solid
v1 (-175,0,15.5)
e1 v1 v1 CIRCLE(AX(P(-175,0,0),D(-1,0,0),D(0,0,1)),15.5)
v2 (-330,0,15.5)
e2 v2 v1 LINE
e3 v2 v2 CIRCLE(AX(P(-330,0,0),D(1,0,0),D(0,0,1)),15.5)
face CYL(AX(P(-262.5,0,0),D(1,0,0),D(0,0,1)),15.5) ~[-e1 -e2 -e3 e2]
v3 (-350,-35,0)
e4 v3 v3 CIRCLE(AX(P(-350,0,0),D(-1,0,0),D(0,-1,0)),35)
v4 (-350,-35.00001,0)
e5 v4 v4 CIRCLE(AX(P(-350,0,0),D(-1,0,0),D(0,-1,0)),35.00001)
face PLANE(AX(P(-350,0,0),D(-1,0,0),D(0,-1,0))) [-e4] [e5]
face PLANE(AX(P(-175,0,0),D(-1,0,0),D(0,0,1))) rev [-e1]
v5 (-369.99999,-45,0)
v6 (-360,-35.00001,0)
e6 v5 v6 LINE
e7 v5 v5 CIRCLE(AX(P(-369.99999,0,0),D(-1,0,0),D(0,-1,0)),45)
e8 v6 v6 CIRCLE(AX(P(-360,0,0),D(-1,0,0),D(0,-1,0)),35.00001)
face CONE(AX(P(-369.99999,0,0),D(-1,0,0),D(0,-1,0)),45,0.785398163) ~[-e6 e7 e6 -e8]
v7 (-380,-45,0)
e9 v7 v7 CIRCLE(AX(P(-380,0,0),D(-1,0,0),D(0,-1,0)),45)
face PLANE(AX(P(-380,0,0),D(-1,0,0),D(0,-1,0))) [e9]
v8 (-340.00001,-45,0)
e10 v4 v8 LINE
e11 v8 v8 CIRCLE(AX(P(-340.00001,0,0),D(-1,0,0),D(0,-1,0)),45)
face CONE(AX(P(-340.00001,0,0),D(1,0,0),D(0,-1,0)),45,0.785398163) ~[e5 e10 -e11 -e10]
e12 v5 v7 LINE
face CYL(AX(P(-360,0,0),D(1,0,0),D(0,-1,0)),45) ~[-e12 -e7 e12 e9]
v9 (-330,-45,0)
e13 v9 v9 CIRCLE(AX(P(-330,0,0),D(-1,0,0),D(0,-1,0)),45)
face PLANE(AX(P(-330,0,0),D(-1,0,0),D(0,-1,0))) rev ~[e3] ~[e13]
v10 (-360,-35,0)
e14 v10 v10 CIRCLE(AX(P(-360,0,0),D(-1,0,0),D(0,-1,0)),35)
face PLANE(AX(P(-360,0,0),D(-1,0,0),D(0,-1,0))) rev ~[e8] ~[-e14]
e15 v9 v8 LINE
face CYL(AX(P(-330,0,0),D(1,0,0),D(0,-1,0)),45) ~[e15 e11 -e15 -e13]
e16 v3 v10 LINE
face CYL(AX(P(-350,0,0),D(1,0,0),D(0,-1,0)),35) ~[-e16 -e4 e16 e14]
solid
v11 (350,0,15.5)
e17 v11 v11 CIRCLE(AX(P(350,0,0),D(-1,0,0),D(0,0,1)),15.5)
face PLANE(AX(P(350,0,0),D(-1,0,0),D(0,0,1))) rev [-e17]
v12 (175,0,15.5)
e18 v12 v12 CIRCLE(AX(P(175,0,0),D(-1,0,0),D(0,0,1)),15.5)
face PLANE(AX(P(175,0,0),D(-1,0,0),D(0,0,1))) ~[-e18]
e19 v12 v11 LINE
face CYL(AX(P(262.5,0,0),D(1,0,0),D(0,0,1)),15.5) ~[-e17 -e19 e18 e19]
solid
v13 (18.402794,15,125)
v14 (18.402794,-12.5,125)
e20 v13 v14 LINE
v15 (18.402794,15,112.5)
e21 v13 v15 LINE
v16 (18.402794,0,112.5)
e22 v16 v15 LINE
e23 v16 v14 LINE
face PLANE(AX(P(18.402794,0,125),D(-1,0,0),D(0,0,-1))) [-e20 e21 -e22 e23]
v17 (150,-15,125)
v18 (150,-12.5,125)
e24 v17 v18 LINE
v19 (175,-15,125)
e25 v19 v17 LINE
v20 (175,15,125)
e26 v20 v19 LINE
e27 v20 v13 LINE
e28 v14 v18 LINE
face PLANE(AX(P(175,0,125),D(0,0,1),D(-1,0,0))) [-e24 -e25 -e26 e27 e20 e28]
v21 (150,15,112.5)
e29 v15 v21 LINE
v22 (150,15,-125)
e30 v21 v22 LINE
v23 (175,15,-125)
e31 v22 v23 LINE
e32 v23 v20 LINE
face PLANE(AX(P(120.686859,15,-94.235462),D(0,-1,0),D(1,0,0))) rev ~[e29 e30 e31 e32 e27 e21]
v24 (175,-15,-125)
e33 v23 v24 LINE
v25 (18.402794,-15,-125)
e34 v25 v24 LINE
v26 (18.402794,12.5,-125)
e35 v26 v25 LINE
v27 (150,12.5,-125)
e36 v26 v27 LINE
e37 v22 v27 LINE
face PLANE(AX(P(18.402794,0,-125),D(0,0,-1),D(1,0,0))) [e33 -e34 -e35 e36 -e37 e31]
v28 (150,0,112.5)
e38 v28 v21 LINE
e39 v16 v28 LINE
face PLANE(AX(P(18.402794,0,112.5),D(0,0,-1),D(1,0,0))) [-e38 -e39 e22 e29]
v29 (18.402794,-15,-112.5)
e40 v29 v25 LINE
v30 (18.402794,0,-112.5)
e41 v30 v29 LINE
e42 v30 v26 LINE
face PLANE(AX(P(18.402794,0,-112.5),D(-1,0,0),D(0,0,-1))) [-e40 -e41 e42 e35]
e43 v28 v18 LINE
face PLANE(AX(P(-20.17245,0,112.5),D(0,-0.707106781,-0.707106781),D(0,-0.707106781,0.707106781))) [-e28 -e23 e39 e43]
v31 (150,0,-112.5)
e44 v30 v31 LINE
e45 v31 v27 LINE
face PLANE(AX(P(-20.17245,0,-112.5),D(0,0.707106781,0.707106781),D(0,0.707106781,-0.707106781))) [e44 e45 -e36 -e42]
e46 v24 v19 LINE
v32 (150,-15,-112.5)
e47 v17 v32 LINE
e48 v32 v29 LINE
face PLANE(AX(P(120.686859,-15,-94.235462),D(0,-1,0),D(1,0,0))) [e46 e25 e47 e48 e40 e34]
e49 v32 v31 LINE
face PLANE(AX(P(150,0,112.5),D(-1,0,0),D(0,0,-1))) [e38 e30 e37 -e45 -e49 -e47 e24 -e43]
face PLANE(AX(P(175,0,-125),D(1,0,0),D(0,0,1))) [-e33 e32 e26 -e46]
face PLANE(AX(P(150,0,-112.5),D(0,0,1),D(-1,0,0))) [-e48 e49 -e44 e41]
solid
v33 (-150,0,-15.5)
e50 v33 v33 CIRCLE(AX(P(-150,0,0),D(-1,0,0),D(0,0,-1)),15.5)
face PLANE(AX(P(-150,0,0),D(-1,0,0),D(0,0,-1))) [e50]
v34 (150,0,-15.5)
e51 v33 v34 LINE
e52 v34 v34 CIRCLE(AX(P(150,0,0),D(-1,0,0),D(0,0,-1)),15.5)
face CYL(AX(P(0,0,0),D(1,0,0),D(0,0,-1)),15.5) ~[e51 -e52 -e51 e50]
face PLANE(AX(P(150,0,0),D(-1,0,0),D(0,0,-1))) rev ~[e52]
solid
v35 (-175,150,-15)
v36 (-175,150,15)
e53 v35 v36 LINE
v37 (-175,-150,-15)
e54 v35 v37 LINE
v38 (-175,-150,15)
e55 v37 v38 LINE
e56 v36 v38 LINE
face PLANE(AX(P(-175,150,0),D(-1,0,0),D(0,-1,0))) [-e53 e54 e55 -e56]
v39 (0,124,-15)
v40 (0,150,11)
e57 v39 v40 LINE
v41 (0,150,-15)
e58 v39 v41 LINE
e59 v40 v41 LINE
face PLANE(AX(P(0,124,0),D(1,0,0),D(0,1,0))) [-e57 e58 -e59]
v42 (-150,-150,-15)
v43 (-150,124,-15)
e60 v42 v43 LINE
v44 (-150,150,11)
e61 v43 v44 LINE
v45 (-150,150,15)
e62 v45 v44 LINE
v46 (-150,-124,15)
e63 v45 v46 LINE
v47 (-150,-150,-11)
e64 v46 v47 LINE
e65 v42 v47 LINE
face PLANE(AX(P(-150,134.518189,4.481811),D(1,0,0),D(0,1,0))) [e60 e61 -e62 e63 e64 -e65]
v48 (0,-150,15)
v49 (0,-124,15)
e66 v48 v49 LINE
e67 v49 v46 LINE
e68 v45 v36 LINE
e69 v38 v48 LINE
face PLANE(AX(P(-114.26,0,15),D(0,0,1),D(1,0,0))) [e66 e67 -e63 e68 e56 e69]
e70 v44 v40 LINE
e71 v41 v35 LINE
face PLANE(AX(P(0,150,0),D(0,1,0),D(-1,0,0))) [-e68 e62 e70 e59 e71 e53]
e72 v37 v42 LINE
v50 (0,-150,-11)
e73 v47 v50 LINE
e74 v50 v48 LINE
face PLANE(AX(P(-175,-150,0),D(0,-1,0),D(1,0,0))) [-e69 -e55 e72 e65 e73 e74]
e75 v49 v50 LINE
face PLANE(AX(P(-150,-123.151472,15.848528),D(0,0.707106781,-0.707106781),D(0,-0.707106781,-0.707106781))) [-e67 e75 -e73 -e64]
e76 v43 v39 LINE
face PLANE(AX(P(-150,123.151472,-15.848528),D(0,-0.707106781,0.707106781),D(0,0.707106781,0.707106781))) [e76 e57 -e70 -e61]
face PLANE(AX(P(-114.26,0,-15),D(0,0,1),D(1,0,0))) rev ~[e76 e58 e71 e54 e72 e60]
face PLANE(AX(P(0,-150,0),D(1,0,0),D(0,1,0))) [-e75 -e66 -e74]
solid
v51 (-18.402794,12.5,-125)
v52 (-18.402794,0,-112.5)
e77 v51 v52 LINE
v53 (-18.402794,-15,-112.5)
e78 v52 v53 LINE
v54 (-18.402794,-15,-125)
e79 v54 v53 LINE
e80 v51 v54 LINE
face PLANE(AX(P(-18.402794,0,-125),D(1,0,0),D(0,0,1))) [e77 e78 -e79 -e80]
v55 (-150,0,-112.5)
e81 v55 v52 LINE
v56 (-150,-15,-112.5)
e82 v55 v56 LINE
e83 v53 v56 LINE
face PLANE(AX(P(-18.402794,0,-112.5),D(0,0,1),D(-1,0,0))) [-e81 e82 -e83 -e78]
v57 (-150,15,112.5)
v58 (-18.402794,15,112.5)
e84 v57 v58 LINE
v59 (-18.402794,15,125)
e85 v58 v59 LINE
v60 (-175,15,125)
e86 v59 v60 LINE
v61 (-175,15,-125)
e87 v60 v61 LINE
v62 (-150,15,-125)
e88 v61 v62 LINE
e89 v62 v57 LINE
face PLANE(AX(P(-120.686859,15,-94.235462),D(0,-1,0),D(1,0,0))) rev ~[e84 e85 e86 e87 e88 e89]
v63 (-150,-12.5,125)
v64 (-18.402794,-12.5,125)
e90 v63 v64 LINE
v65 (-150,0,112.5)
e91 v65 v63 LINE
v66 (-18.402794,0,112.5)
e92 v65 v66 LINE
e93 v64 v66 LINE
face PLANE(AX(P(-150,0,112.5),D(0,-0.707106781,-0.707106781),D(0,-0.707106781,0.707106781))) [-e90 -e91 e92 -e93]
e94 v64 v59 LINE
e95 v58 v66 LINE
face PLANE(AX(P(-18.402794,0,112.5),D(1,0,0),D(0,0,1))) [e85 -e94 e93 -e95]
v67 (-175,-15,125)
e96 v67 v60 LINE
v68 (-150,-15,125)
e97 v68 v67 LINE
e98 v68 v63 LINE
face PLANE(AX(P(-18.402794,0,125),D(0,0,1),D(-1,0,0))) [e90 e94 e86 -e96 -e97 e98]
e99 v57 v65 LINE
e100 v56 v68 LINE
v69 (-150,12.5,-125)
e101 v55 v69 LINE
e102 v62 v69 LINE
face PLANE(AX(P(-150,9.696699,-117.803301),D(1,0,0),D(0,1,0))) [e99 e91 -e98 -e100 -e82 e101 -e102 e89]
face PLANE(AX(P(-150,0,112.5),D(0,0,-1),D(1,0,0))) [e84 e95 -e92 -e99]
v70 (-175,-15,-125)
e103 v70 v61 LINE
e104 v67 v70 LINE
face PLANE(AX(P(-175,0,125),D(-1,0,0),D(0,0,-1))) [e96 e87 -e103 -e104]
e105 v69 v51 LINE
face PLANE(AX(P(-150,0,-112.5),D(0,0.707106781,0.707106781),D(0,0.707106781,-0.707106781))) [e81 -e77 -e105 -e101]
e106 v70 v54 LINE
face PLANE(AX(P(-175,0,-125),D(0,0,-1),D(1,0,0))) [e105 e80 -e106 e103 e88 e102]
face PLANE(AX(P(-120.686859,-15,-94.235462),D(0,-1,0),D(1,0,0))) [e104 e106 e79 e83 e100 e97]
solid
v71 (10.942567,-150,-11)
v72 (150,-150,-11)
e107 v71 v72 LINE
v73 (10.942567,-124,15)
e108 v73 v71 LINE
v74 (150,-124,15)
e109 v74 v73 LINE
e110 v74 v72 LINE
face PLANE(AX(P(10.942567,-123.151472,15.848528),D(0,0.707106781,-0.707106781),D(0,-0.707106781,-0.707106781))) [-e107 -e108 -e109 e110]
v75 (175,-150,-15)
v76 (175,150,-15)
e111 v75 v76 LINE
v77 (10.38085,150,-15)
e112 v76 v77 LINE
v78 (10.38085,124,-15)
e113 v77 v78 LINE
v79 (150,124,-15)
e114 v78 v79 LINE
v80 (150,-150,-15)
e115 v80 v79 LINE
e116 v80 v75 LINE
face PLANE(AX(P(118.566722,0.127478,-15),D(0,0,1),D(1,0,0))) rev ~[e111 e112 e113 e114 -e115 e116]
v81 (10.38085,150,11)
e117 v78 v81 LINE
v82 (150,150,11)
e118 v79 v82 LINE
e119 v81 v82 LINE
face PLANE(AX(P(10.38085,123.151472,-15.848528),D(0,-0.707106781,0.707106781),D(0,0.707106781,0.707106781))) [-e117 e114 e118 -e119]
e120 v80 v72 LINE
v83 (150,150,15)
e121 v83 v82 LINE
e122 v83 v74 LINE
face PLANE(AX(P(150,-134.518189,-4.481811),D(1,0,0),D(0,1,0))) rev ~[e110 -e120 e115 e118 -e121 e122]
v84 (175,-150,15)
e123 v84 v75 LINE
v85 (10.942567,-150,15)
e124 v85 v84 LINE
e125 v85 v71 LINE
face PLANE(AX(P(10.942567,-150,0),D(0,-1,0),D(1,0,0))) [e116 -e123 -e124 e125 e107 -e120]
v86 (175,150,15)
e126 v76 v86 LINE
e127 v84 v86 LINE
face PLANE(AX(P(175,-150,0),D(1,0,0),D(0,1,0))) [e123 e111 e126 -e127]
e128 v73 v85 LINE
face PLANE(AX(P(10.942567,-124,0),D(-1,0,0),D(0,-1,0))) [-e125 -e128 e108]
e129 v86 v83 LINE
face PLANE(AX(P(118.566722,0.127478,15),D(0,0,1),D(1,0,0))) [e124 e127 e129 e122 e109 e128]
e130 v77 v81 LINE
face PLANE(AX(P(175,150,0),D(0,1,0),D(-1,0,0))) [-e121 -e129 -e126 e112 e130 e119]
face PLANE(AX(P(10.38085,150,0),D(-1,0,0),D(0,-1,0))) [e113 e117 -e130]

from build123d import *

# Parameters (mm, degrees)
F0_W           = 175
F0_H           = 15.5
F0_W_2         = 25
F2_DEPTH       = 15
F4_DEPTH       = 15
F5_T1_DEPTH    = 150
F5_2_T1_DEPTH  = 139.6191499531
F5_2_T3_DEPTH  = 139.0574328601
F6_R           = 50
F7_DEPTH       = 20
F8_R           = 45
F9_DEPTH       = 20
F10_R          = 35
F11_DEPTH      = 10
F12_R          = 45
F13_DEPTH      = 20
F14_SIZE       = 9.99999
F15_T1_DEPTH   = 170.1724504435
F15_2_T1_DEPTH = 170.1724504435
F16_T1_DEPTH   = 170.1724504435
F16_2_T1_DEPTH = 170.1724504435
F0_W_3         = 300


# Not quite as in the source:
# - a fillet or chamfer that OpenCascade refuses, or shapes differently, is made with other operations: its cross-section is extruded or revolved along the edge and cut away or added
# - a fillet or chamfer is up to 0.001 mm smaller than in the source, because OpenCascade refuses the exact size
# - a feature names something its author has since deleted; it is built from what else it names


with BuildPart() as f1:
    # F0 (on Front) → F1 (revolve)
    with BuildSketch(Plane.XZ):
        with Locations((262.5, 7.75)):
            Rectangle(F0_W, F0_H)
    revolve(axis=Axis((0, 0, 0), (-1, 0, 0)))


with BuildPart() as f1b:
    # F0 (on Front) → F1, piece 2 (revolve)
    with BuildSketch(Plane.XZ):
        with Locations((-262.5, 7.75)):
            Rectangle(F0_W, F0_H)
    revolve(axis=Axis((0, 0, 0), (-1, 0, 0)))

    # F6 (on face) → F7 (cut)
    with BuildSketch(Plane(origin=(-350, 0, 0), x_dir=(0, -1, 0), z_dir=(-1, 0, 0))):
        Circle(F6_R)
    extrude(amount=-F7_DEPTH, mode=Mode.SUBTRACT)

    # F8 (on face) → F9 (join)
    with BuildSketch(Plane(origin=(-330, 0, 0), x_dir=(0, -1, 0), z_dir=(-1, 0, 0))):
        Circle(F8_R)
    extrude(amount=F9_DEPTH)

    # F10 (on face) → F11 (join)
    with BuildSketch(Plane(origin=(-350, 0, 0), x_dir=(0, -1, 0), z_dir=(-1, 0, 0))):
        Circle(F10_R)
    extrude(amount=F11_DEPTH)

    # F12 (on face) → F13 (join)
    with BuildSketch(Plane(origin=(-360, 0, 0), x_dir=(0, -1, 0), z_dir=(-1, 0, 0))):
        Circle(F12_R)
    extrude(amount=F13_DEPTH)

    # F14 (size 10 in the source; OpenCascade refuses exactly that, so slightly less here)
    f14_edges = [f1b.edges().sort_by_distance(p)[0] for p in [
        (-350, 45, 0),
        (-360, 45, 0),
    ]]
    chamfer(f14_edges, length=F14_SIZE)


with BuildPart() as f2:
    # F0 (on Front) → F2 (new body, symmetric)
    with BuildSketch(Plane.XZ):
        Polygon((-150, -15.5), (-175, -15.5), (-175, -125), (-18.402794376, -125), (-18.402794376, -112.5), (-150, -112.5), align=None)
        Polygon((-175, 125), (-175, 15.5), (-150, 15.5), (-150, 112.5), (-18.402794376, 112.5), (-18.402794376, 125), align=None)
        with Locations((-162.5, 7.75)):
            Rectangle(F0_W_2, F0_H)
        with Locations((-162.5, -7.75)):
            Rectangle(F0_W_2, F0_H)
    extrude(amount=F2_DEPTH, both=True)

    # F15: chamfer of 15 on 1 edges, made by hand

    # F15_s2 → F15_t1 (cut)
    with BuildSketch(Plane.YZ.offset(-150)):
        Polygon((0, 112.5), (-15, 127.5), (-15, 112.5), align=None)
    extrude(amount=F15_T1_DEPTH, mode=Mode.SUBTRACT)

    # F16: chamfer of 15 on 1 edges, made by hand

    # F16_s2 → F16_t1 (cut)
    with BuildSketch(Plane.YZ.offset(-150)):
        Polygon((0, -112.5), (15, -127.5), (15, -112.5), align=None)
    extrude(amount=F16_T1_DEPTH, mode=Mode.SUBTRACT)


with BuildPart() as f2b:
    # F0 (on Front) → F2, piece 2 (new body, symmetric)
    with BuildSketch(Plane.XZ):
        Polygon((175, -15.5), (150, -15.5), (150, -112.5), (18.402794376, -112.5), (18.402794376, -125), (175, -125), align=None)
        Polygon((150, 112.5), (150, 15.5), (175, 15.5), (175, 125), (18.402794376, 125), (18.402794376, 112.5), align=None)
        with Locations((162.5, 7.75)):
            Rectangle(F0_W_2, F0_H)
        with Locations((162.5, -7.75)):
            Rectangle(F0_W_2, F0_H)
    extrude(amount=F2_DEPTH, both=True)

    # F15#2: chamfer of 15 on 1 edges, made by hand

    # F15_2_s2 → F15_2_t1 (cut)
    with BuildSketch(Plane.YZ.offset(-20.1724504435)):
        Polygon((0, 112.5), (-15, 127.5), (-15, 112.5), align=None)
    extrude(amount=F15_2_T1_DEPTH, mode=Mode.SUBTRACT)

    # F16#2: chamfer of 15 on 1 edges, made by hand

    # F16_2_s2 → F16_2_t1 (cut)
    with BuildSketch(Plane.YZ.offset(-20.1724504435)):
        Polygon((0, -112.5), (15, -127.5), (15, -112.5), align=None)
    extrude(amount=F16_2_T1_DEPTH, mode=Mode.SUBTRACT)


with BuildPart() as f4:
    # F3 (on Top) → F4 (new body, symmetric)
    with BuildSketch(Plane.XY):
        Polygon((175, -150), (175, 150), (10.3808500469, 150), (10.3808500469, 124), (150, 124), (150, -124), (10.9425671399, -124), (10.9425671399, -150), align=None)
    extrude(amount=F4_DEPTH, both=True)

    # F5#2: chamfer of 30 on 2 edges, made by hand

    # F5_2_s2 → F5_2_t1 (cut)
    with BuildSketch(Plane.YZ.offset(10.3808500469)):
        with BuildLine():
            Line((123.1514718626, -15.8485281374), (154.8485281374, 15.8485281374))
            Line((154.8485281374, 15.8485281374), (154.8485281374, 16.4485281374))
            ThreePointArc((154.8485281374, 16.4485281374), (139.4242640687, 15.6), (124, 15.6))
            Line((124, 15.6), (123.4, 15))
            ThreePointArc((123.4, 15), (123.4, -0.4242640687), (122.5514718626, -15.8485281374))
            Line((122.5514718626, -15.8485281374), (123.1514718626, -15.8485281374))
        make_face()
    extrude(amount=F5_2_T1_DEPTH, mode=Mode.SUBTRACT)

    # F5_2_s4 → F5_2_t3 (cut)
    with BuildSketch(Plane.YZ.offset(10.9425671399)):
        with BuildLine():
            Line((-123.1514718626, 15.8485281374), (-154.8485281374, -15.8485281374))
            Line((-154.8485281374, -15.8485281374), (-154.8485281374, -16.4485281374))
            ThreePointArc((-154.8485281374, -16.4485281374), (-139.4242640687, -15.6), (-124, -15.6))
            Line((-124, -15.6), (-123.4, -15))
            ThreePointArc((-123.4, -15), (-123.4, 0.4242640687), (-122.5514718626, 15.8485281374))
            Line((-122.5514718626, 15.8485281374), (-123.1514718626, 15.8485281374))
        make_face()
    extrude(amount=F5_2_T3_DEPTH, mode=Mode.SUBTRACT)


with BuildPart() as f4b:
    # F3 (on Top) → F4, piece 2 (new body, symmetric)
    with BuildSketch(Plane.XY):
        Polygon((0, 150), (-175, 150), (-175, -150), (0, -150), (0, -124), (-150, -124), (-150, 124), (0, 124), align=None)
    extrude(amount=F4_DEPTH, both=True)

    # F5: chamfer of 30 on 2 edges, made by hand

    # F5_s2 → F5_t1 (cut)
    with BuildSketch(Plane.YZ.offset(-150)):
        with BuildLine():
            Line((123.1514718626, -15.8485281374), (154.8485281374, 15.8485281374))
            Line((154.8485281374, 15.8485281374), (154.8485281374, 16.4485281374))
            ThreePointArc((154.8485281374, 16.4485281374), (139.4242640687, 15.6), (124, 15.6))
            Line((124, 15.6), (123.4, 15))
            ThreePointArc((123.4, 15), (123.4, -0.4242640687), (122.5514718626, -15.8485281374))
            Line((122.5514718626, -15.8485281374), (123.1514718626, -15.8485281374))
        make_face()
        with BuildLine():
            Line((-123.1514718626, 15.8485281374), (-154.8485281374, -15.8485281374))
            Line((-154.8485281374, -15.8485281374), (-154.8485281374, -16.4485281374))
            ThreePointArc((-154.8485281374, -16.4485281374), (-139.4242640687, -15.6), (-124, -15.6))
            Line((-124, -15.6), (-123.4, -15))
            ThreePointArc((-123.4, -15), (-123.4, 0.4242640687), (-122.5514718626, 15.8485281374))
            Line((-122.5514718626, 15.8485281374), (-123.1514718626, 15.8485281374))
        make_face()
    extrude(amount=F5_T1_DEPTH, mode=Mode.SUBTRACT)


with BuildPart() as f17:
    # F0 (on Front) → F17 (revolve)
    with BuildSketch(Plane.XZ):
        with Locations((0, -7.75)):
            Rectangle(F0_W_3, F0_H)
    revolve(axis=Axis((0, 0, 0), (-1, 0, 0)))


solid = Compound([f1.part, f1b.part, f2.part, f2b.part, f4.part, f4b.part, f17.part])
